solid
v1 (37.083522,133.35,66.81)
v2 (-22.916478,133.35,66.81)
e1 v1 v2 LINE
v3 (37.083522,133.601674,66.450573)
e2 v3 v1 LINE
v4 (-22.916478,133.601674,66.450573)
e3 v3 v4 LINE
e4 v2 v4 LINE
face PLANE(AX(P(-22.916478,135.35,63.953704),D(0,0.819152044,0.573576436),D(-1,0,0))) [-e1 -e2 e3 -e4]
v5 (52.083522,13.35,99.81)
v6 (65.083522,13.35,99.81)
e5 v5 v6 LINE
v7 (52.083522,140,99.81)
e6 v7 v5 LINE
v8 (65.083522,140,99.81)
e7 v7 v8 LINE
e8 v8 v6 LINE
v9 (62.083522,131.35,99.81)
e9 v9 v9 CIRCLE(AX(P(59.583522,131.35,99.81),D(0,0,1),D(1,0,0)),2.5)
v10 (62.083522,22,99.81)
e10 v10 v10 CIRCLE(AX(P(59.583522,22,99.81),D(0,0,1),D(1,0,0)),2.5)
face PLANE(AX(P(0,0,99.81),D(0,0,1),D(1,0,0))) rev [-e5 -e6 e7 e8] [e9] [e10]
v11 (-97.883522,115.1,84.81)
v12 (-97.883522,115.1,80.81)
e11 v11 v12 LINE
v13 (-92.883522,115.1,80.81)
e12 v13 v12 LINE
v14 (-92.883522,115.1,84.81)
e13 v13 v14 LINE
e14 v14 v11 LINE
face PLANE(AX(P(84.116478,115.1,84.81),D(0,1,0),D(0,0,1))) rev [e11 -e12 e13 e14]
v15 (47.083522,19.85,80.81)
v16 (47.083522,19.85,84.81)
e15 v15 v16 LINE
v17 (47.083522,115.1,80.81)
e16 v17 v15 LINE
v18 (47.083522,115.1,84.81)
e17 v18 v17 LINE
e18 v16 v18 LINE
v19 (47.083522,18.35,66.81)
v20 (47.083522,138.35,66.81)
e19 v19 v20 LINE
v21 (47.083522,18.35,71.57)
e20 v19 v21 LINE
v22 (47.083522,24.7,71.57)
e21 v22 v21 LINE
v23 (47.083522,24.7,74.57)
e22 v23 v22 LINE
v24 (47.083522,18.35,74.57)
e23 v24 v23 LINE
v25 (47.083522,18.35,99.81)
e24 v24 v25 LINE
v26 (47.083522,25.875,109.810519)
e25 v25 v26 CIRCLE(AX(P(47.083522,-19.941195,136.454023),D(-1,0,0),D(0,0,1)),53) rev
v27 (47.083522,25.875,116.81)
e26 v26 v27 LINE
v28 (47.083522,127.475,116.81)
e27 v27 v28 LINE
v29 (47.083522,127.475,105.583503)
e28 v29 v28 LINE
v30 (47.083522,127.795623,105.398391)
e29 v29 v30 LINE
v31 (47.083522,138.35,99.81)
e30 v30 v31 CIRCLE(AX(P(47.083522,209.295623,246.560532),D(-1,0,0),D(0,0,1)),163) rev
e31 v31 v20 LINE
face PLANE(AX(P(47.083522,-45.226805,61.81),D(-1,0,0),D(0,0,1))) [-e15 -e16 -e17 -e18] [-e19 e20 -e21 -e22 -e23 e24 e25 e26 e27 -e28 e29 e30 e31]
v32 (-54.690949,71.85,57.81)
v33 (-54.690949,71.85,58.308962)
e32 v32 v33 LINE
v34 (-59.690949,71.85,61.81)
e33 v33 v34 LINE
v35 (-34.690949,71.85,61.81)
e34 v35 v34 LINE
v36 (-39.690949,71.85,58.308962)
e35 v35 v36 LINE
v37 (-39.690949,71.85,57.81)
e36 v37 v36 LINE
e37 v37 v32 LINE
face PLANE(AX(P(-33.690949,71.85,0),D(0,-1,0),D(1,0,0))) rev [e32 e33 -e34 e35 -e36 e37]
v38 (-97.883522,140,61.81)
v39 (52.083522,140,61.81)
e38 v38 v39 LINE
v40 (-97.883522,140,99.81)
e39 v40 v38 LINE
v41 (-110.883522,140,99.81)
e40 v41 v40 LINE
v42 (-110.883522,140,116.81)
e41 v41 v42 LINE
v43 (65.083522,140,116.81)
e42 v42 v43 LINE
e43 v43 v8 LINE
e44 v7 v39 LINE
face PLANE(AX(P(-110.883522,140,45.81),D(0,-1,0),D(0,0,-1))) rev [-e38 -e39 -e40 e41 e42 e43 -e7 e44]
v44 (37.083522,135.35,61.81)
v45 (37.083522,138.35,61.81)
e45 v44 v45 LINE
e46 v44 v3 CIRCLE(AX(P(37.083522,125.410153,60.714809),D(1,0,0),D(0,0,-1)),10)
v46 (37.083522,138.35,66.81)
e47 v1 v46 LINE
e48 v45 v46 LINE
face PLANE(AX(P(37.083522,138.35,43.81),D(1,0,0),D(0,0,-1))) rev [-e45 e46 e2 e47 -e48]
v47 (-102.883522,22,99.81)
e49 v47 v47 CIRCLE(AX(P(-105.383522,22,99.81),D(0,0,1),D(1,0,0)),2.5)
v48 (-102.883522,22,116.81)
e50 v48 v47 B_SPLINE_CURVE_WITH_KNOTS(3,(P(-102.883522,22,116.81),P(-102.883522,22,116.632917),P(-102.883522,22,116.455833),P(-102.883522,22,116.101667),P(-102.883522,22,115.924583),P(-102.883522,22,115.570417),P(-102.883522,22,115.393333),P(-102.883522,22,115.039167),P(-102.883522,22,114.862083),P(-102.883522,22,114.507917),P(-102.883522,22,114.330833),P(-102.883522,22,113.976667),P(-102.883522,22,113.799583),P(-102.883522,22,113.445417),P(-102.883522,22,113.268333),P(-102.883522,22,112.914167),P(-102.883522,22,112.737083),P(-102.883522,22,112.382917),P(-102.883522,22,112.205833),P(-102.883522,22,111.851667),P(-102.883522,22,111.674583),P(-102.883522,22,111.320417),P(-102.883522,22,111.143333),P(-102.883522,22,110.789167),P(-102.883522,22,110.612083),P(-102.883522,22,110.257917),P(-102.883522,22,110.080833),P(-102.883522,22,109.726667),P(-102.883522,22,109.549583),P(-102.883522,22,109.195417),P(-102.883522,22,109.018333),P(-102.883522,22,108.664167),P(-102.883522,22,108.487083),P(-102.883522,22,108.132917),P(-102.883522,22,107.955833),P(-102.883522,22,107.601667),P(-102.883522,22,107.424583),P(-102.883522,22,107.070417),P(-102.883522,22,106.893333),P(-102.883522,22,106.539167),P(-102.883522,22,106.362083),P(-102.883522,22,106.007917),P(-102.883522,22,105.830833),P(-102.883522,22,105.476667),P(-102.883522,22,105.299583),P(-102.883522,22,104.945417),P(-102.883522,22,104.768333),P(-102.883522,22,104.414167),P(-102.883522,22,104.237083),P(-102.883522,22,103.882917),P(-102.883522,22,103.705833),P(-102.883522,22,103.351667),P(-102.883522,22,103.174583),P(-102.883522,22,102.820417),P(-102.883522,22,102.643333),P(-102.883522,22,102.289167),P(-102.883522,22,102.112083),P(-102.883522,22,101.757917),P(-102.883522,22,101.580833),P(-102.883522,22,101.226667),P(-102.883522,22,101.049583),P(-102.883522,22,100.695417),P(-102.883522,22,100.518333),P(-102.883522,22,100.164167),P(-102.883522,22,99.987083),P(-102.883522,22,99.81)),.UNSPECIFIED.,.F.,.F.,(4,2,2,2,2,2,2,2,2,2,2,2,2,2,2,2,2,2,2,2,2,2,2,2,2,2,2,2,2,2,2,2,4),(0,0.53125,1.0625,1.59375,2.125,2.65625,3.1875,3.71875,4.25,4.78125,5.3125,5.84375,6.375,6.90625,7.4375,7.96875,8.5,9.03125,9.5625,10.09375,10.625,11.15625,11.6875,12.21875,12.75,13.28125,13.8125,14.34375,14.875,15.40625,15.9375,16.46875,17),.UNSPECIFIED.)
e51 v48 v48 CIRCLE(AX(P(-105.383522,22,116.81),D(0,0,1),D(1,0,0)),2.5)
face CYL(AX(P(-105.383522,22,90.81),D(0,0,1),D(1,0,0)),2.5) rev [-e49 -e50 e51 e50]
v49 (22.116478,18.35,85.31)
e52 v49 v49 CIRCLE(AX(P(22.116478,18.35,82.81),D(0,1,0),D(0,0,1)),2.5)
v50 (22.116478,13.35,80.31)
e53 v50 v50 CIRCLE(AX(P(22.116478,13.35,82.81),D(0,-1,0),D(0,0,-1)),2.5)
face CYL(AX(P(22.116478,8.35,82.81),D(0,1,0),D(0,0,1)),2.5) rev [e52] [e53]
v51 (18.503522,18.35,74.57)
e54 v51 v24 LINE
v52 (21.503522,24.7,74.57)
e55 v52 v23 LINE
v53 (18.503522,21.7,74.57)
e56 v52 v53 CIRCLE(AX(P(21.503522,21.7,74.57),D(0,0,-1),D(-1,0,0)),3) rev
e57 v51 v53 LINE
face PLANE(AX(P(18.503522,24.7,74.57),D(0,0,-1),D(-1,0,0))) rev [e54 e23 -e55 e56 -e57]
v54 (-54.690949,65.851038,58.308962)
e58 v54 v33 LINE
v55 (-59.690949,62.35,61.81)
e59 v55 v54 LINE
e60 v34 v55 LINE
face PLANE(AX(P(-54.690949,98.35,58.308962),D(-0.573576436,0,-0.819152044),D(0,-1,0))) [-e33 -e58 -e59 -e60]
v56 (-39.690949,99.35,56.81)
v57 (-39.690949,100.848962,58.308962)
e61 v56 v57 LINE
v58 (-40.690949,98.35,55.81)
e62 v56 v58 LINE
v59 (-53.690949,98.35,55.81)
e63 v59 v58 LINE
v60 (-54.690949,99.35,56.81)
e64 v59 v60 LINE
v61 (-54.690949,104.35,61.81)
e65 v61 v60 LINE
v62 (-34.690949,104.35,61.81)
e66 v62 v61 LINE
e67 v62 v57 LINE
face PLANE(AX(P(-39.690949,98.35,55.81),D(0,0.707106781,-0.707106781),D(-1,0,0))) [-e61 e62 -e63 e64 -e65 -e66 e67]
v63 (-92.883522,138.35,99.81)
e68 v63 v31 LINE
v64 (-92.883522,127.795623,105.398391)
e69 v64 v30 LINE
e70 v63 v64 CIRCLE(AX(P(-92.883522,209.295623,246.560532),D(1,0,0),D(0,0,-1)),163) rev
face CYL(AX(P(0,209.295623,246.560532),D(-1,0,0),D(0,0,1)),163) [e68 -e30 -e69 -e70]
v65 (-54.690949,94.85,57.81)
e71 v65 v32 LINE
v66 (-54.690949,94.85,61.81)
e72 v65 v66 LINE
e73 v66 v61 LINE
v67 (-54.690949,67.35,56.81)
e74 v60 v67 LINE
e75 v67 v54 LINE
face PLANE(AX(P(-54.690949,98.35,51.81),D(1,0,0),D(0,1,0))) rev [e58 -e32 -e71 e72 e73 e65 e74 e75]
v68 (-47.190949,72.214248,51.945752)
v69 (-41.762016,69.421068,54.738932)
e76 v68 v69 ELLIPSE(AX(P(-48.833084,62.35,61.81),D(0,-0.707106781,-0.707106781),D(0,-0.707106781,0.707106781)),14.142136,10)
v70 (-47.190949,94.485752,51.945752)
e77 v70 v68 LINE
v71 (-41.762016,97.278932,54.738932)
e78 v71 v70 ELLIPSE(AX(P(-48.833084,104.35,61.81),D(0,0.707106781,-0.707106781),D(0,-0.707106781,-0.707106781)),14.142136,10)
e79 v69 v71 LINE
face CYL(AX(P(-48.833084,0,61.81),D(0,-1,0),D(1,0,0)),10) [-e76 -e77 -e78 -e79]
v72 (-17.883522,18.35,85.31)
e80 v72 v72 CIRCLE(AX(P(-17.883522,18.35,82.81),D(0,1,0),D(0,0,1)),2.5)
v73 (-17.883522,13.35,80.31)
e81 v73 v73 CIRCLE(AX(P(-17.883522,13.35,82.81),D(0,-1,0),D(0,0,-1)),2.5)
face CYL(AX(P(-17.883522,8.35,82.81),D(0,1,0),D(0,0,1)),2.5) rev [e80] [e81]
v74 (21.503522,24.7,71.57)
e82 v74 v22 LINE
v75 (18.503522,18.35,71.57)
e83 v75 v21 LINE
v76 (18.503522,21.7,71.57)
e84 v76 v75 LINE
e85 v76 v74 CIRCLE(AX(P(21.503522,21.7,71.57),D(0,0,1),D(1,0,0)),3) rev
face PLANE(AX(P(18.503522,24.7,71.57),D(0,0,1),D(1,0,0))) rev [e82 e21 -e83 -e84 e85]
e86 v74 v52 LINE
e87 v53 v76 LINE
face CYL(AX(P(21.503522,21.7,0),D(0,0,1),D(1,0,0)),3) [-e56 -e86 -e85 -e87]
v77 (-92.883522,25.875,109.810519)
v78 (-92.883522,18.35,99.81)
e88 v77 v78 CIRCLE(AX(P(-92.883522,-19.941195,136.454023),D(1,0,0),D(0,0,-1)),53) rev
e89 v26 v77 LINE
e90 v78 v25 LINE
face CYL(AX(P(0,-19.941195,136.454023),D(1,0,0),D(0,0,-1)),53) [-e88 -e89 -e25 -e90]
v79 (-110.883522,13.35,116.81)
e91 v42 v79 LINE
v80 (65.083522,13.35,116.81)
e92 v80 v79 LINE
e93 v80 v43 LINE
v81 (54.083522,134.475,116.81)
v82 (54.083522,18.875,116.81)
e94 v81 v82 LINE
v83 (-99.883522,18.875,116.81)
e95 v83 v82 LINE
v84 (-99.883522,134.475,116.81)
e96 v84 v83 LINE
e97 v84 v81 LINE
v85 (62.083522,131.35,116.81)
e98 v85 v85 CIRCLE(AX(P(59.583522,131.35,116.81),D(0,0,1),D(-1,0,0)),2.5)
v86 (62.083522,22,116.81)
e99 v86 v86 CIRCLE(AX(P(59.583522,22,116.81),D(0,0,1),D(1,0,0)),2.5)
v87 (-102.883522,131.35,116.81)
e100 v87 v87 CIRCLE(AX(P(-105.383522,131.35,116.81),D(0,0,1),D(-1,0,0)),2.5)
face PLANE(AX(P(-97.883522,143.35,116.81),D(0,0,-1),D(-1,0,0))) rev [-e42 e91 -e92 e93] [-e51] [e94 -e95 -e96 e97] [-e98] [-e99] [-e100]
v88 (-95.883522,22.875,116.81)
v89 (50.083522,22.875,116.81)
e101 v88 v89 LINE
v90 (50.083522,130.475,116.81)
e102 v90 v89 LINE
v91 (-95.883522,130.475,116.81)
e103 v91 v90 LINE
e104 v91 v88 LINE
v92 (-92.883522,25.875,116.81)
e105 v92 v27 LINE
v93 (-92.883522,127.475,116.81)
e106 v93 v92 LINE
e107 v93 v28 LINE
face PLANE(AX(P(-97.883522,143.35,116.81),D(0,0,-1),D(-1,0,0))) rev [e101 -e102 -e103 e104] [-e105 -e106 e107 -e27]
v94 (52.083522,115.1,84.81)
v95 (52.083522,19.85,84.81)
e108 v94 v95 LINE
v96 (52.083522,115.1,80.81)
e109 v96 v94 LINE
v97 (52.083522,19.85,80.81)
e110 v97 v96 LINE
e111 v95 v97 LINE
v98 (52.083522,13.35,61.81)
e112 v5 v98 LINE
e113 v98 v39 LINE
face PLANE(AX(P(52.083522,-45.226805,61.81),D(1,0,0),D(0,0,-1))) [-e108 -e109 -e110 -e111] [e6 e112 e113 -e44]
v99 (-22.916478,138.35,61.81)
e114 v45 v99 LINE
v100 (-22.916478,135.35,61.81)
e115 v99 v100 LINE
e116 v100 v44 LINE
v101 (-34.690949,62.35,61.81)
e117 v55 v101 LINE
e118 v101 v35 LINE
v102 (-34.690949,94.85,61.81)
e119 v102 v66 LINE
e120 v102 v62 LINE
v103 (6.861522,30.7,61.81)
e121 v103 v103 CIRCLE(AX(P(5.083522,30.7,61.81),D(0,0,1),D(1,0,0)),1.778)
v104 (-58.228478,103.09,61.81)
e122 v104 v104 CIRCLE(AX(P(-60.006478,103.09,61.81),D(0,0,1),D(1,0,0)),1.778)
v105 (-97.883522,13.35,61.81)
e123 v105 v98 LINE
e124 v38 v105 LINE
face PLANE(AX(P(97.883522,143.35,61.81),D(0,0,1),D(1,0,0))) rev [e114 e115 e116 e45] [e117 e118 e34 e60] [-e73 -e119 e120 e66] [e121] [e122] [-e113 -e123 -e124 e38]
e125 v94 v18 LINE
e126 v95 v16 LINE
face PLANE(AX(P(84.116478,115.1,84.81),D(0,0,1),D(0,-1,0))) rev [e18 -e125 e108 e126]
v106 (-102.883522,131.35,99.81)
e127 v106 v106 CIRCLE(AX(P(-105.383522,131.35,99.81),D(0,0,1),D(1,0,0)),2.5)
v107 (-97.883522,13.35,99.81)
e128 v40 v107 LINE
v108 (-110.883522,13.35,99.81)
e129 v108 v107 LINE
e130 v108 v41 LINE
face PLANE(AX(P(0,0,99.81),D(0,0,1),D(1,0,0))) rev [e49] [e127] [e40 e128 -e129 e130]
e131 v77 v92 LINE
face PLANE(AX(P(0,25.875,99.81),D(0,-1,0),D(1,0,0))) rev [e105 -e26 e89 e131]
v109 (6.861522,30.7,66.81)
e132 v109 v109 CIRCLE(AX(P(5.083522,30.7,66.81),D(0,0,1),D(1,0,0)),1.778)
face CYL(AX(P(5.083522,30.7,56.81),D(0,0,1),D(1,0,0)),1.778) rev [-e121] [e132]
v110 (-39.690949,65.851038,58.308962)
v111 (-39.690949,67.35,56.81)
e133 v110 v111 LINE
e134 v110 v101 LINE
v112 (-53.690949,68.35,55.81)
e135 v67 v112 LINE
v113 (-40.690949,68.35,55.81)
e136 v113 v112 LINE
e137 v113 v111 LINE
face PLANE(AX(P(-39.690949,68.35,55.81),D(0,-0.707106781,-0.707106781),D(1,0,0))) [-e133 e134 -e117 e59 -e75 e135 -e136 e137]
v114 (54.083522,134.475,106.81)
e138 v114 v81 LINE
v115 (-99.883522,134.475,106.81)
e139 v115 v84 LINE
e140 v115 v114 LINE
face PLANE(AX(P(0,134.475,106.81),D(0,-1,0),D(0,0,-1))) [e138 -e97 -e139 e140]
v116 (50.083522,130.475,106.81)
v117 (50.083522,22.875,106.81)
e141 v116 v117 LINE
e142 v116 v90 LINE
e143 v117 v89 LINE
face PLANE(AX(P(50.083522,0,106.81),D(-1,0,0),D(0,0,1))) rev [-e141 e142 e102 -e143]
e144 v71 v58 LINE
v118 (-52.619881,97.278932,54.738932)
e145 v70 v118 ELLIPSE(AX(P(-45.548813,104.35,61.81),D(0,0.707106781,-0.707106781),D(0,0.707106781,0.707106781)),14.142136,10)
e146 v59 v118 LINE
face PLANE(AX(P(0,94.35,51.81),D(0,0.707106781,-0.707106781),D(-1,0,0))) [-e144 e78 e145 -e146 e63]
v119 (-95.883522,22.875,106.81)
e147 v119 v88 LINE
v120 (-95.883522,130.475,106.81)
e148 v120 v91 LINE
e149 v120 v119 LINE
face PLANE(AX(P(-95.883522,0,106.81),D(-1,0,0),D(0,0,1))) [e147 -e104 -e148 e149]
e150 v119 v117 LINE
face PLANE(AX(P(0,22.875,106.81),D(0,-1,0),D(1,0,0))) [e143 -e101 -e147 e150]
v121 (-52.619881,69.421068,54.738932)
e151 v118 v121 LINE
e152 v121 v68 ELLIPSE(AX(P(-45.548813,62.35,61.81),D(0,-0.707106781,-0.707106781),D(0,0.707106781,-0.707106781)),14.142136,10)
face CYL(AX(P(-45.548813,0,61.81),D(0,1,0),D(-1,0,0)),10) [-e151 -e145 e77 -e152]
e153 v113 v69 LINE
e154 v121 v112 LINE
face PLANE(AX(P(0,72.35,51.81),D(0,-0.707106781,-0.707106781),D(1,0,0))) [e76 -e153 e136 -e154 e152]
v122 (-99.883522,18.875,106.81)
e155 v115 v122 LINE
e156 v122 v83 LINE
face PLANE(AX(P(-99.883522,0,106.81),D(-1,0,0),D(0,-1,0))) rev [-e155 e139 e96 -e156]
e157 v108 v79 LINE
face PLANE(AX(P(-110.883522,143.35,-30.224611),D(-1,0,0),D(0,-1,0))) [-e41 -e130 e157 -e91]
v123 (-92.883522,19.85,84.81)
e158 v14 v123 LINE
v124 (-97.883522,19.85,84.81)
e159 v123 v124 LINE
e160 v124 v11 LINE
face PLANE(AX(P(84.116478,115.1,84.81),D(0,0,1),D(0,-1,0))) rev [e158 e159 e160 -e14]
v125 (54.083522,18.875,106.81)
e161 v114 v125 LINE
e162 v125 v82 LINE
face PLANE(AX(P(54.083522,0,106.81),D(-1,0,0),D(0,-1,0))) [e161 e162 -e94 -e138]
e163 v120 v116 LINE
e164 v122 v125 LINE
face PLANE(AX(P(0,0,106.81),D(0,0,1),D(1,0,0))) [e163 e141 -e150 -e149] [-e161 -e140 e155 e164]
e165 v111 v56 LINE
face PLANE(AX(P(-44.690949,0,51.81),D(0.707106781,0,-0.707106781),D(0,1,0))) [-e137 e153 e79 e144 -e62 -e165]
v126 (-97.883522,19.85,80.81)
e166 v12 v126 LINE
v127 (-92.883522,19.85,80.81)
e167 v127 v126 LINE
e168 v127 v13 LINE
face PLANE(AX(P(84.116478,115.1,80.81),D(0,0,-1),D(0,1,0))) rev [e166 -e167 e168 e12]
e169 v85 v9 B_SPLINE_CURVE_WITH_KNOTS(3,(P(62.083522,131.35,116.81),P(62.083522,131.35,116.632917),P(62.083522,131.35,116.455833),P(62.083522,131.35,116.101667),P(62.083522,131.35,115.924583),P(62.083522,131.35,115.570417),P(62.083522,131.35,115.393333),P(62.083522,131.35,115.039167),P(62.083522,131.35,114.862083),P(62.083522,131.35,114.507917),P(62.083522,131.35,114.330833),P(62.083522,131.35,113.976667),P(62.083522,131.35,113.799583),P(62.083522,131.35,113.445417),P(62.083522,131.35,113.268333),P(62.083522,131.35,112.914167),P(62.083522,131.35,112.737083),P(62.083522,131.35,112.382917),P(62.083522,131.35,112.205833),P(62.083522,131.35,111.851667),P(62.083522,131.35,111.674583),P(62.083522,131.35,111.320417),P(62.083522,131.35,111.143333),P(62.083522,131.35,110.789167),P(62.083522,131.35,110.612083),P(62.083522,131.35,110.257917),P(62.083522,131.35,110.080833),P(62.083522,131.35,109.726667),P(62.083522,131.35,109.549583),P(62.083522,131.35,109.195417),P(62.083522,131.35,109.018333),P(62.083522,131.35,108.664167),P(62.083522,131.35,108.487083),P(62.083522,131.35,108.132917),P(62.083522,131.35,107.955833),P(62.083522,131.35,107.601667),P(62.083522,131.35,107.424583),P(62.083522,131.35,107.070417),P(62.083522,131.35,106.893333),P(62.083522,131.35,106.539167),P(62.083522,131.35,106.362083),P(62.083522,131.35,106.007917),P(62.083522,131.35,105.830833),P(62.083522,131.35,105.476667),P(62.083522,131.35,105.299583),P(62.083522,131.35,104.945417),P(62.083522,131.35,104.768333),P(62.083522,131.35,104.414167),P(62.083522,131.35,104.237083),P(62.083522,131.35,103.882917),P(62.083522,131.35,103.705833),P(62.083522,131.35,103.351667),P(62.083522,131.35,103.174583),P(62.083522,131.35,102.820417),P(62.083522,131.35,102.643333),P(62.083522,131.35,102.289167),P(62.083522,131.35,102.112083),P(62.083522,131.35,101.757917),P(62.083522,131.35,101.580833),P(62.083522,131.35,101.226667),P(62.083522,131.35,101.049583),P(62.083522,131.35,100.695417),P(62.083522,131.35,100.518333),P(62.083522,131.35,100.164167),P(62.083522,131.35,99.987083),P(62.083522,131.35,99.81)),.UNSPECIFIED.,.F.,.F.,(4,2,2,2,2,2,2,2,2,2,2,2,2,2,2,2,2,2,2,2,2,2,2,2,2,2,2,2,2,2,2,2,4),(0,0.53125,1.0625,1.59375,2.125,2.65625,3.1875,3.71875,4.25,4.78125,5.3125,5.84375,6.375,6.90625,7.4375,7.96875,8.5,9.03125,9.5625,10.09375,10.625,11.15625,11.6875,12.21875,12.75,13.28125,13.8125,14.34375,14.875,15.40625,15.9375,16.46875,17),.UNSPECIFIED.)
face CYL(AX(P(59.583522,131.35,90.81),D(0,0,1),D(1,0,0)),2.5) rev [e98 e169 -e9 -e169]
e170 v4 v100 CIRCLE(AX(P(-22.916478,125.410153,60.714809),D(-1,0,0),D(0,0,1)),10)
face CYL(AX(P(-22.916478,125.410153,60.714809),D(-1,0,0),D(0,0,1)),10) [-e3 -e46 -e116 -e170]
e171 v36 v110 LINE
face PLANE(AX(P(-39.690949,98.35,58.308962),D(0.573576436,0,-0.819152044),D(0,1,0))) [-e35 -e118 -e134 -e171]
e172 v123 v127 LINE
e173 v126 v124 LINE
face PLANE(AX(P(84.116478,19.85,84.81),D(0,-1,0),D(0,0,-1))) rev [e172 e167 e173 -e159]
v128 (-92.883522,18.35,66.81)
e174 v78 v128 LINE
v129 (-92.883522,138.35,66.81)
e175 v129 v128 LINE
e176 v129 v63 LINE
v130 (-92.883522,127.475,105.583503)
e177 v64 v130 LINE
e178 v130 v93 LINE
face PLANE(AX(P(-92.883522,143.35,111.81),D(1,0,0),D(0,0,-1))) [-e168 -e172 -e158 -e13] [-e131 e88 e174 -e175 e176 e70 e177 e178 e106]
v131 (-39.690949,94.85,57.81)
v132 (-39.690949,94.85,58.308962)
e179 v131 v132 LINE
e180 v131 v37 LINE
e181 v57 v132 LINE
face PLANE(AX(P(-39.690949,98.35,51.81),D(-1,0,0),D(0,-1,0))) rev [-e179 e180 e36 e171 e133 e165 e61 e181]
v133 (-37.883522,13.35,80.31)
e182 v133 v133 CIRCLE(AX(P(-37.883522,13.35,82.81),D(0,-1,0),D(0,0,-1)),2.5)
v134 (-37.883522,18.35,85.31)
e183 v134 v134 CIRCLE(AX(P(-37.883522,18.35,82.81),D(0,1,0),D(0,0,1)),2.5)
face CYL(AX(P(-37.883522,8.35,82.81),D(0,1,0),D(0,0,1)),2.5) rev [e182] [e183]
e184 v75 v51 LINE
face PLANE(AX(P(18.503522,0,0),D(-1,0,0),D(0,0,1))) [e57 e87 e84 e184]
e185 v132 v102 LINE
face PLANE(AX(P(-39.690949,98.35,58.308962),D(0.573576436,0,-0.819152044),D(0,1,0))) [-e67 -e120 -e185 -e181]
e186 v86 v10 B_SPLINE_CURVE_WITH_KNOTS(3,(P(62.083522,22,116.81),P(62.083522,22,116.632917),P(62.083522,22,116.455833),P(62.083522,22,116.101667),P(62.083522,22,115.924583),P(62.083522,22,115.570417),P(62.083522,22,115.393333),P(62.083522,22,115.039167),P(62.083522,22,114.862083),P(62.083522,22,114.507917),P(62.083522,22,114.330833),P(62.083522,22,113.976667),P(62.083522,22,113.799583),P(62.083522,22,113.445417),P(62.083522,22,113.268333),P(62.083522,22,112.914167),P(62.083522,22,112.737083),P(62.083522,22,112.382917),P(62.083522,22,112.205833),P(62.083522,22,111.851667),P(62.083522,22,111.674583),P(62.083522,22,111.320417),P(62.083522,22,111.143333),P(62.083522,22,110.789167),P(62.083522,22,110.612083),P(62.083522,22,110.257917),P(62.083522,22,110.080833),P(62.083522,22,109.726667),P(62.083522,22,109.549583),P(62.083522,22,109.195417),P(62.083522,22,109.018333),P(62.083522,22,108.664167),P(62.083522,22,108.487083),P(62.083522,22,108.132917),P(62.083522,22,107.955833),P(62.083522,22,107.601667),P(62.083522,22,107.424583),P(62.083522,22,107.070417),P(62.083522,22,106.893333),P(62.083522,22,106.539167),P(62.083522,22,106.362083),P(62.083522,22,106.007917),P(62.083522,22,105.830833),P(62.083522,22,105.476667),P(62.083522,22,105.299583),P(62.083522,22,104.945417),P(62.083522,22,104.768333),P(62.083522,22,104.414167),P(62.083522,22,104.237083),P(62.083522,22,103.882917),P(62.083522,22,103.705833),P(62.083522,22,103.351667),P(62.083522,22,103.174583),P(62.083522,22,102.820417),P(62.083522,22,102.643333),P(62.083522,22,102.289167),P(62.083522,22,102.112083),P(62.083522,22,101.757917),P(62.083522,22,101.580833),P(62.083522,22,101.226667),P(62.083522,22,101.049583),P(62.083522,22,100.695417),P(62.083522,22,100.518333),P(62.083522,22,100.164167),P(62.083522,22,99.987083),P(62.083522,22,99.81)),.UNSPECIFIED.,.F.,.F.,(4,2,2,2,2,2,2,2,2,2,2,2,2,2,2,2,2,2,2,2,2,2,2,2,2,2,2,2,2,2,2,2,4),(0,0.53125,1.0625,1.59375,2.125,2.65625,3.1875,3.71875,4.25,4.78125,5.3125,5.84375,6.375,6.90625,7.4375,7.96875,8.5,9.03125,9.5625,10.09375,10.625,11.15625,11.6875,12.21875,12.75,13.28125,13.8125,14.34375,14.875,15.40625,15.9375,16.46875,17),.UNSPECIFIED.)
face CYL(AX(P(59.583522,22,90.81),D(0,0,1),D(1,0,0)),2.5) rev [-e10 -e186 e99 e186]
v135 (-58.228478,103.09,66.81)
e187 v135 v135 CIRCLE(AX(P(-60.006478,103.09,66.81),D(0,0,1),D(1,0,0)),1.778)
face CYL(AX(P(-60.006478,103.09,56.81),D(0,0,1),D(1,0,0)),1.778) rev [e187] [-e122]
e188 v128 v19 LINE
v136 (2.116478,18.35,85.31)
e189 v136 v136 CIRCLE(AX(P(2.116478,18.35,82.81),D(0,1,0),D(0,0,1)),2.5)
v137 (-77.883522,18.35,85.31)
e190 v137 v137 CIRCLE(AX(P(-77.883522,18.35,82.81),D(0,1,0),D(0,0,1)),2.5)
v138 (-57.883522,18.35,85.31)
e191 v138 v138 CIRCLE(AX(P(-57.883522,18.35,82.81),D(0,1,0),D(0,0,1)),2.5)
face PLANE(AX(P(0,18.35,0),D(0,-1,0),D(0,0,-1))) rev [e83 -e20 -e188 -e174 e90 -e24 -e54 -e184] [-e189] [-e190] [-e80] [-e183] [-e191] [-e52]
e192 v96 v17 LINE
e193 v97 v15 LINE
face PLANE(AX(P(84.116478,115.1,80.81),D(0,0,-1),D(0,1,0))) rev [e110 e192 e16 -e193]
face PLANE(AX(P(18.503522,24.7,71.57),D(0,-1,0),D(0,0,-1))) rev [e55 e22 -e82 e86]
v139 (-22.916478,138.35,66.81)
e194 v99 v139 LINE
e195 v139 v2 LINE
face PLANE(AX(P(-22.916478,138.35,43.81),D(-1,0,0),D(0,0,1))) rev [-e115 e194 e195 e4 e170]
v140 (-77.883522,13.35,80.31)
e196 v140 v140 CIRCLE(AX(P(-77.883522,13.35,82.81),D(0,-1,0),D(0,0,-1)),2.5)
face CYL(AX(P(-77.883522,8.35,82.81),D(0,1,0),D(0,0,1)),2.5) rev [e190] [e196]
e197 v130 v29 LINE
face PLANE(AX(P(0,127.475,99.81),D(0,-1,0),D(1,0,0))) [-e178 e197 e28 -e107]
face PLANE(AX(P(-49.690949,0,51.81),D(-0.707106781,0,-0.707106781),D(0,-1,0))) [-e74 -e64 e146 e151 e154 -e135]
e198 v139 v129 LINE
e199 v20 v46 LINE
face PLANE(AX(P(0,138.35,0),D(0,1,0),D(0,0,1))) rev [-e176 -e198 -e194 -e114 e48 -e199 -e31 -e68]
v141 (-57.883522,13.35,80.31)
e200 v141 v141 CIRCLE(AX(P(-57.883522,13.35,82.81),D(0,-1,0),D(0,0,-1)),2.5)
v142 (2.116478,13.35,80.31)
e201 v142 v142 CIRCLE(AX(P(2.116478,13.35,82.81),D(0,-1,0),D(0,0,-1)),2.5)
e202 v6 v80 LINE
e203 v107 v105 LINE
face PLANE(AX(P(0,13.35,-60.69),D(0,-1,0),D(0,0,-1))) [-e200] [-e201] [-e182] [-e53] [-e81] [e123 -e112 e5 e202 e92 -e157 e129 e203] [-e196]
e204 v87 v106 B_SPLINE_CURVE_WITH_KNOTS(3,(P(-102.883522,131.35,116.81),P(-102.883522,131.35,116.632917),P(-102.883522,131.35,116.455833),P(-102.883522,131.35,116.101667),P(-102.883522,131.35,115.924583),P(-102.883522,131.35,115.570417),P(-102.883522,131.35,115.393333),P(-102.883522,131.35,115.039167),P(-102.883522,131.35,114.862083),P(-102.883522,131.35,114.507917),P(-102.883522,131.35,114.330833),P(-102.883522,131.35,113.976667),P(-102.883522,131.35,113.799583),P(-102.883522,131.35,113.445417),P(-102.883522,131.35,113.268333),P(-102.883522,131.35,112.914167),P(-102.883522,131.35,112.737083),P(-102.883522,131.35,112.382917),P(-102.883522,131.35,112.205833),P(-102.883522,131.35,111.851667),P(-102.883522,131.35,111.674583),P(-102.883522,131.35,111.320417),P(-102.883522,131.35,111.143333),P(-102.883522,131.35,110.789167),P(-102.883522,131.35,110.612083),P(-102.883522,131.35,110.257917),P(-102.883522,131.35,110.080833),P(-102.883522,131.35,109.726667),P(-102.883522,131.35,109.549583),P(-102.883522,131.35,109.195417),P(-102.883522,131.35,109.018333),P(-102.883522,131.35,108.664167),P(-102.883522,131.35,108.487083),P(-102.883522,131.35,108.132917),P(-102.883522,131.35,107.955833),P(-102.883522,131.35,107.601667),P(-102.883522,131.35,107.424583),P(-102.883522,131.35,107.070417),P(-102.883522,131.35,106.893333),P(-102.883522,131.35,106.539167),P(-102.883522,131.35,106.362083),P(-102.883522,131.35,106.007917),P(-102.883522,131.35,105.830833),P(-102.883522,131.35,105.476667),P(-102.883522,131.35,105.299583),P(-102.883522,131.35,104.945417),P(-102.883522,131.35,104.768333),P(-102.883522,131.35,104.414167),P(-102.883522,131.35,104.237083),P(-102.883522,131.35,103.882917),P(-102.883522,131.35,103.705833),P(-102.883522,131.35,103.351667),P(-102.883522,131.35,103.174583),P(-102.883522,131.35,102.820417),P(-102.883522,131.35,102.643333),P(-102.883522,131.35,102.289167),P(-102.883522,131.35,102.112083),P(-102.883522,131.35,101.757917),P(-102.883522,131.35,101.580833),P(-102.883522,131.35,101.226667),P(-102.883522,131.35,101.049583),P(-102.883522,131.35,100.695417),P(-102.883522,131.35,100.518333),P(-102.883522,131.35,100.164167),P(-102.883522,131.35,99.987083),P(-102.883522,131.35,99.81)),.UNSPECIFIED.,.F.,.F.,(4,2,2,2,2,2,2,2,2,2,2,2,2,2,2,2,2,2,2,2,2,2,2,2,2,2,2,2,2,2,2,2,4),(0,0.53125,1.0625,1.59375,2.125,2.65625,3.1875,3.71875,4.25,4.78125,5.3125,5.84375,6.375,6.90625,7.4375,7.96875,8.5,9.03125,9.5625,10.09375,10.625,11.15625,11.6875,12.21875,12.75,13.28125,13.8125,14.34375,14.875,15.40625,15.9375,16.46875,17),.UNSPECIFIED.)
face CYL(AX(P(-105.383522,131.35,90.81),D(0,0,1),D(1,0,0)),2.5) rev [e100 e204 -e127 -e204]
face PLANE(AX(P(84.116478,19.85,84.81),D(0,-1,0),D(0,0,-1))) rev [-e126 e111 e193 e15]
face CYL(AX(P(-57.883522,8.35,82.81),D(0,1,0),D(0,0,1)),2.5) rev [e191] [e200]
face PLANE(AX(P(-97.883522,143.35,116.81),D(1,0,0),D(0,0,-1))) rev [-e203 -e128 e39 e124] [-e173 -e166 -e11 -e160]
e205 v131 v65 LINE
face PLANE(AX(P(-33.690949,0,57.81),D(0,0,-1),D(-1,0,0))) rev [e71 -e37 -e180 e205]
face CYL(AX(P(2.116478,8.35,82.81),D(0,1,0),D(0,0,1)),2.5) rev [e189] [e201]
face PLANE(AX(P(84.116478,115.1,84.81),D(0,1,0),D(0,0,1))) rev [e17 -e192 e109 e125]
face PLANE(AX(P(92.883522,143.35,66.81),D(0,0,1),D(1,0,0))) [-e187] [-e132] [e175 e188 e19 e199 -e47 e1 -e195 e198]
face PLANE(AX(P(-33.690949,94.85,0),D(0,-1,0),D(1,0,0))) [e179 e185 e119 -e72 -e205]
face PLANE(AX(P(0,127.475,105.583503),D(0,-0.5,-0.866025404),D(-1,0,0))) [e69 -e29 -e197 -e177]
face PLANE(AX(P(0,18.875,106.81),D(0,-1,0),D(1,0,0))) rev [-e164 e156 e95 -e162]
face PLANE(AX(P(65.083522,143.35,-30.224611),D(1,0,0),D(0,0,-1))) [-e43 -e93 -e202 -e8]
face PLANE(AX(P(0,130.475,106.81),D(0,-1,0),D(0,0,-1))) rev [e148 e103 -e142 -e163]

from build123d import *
from OCP.BRepFilletAPI import BRepFilletAPI_MakeChamfer

# Parameters (mm, degrees)
SKETCH1_R               = 172.5
BOSS_EXTRUDE1_DEPTH     = 10
SKETCH2_R               = 48.41
CUT_EXTRUDE1_DEPTH      = 10
BOSS_EXTRUDE2_DEPTH     = 5
CUT_EXTRUDE2_DEPTH      = 497
CUT_EXTRUDE6_START      = -497
CUT_EXTRUDE6_DEPTH      = 497
SKETCH6_W               = 195.767044214
SKETCH6_H               = 55
SKETCH6_W_2             = 185.767044214
SKETCH6_H_2             = 45
BOSS_EXTRUDE3_DEPTH     = 133.35
SKETCH7_W               = 185.767044214
SKETCH7_H               = 45
BOSS_EXTRUDE4_DEPTH     = 5
BOSS_EXTRUDE5_DEPTH     = 8
CHAMFER1_SIZE           = 8
CHAMFER1_SIZE2          = 6.250285012
CHAMFER1_PART_2_SIZE    = 8
CHAMFER1_PART_2_SIZE2   = 6.250285012
CHAMFER1_PART_3_SIZE    = 8
CHAMFER1_PART_3_SIZE2   = 6.250285012
FILLET1_R               = 38
SKETCH9_R               = 374.079334695
CUT_EXTRUDE7_DEPTH      = 93
CUT_EXTRUDE8_DEPTH      = 93
CUT_EXTRUDE8_DEPTH_BACK = 93
SKETCH10_R              = 229.38613092
SKETCH10_R_2            = 152.4
SKETCH11_W              = 291.443368419
SKETCH11_H              = 134.798764099
SKETCH11_W_2            = 144.967044214
SKETCH11_H_2            = 55
CUT_EXTRUDE9_DEPTH      = 143
SKETCH12_W              = 5
SKETCH12_H              = 55
BOSS_EXTRUDE6_DEPTH     = 133.35
SKETCH14_W              = 139.967044214
SKETCH14_H              = 45
BOSS_EXTRUDE7_DEPTH     = 5
SKETCH15_W              = 139.967044214
SKETCH15_H              = 123.35
CUT_EXTRUDE11_DEPTH     = 13
SKETCH16_W              = 10
SKETCH16_H              = 133.35
SKETCH16_W_2            = 149.967044214
BOSS_EXTRUDE9_DEPTH     = 17
SKETCH17_W              = 153.967044214
SKETCH17_H              = 115.6
SKETCH17_W_2            = 145.967044214
SKETCH17_H_2            = 107.6
CUT_EXTRUDE12_DEPTH     = 10
CHAMFER2_SIZE           = 10
CHAMFER2_SIZE2          = 5.773502692
SKETCH20_W              = 169.967044214
SKETCH20_H              = 3.35
CUT_EXTRUDE17_DEPTH     = 177.5
SKETCH25_W              = 139.967044214
SKETCH25_H              = 38.773502692
BOSS_EXTRUDE11_DEPTH    = 5
SKETCH26_W              = 3
SKETCH26_H              = 130
BOSS_EXTRUDE12_DEPTH    = 17
SKETCH18_R              = 2.5
CUT_EXTRUDE19_DEPTH     = 26
SKETCH27_W              = 60
SKETCH27_H              = 3
CUT_EXTRUDE20_DEPTH     = 23
SKETCH28_R              = 2.5
CUT_EXTRUDE21_DEPTH     = 10
SKETCH29_W              = 15
SKETCH29_H              = 30
BOSS_EXTRUDE13_DEPTH    = 10
SKETCH30_W              = 4
SKETCH30_H              = 23
CUT_EXTRUDE22_DEPTH     = 21
CHAMFER3_SIZE           = 6
SKETCH31_W              = 175.967044214
SKETCH31_H              = 24.006818343
CUT_EXTRUDE23_DEPTH     = 71
SKETCH33_W              = 4
SKETCH33_H              = 95.25
CUT_EXTRUDE25_DEPTH     = 182
CHAMFER5_SIZE           = 5
CHAMFER6_SIZE           = 4
FILLET2_R               = 10
SKETCH32_R              = 1.778
CUT_EXTRUDE26_DEPTH     = 10
CHAMFER7_SIZE           = 5
CHAMFER7_SIZE2          = 3.501037691
SKETCH34_W              = 3
SKETCH34_H              = 6.35
BOSS_EXTRUDE14_DEPTH    = 28.58
FILLET3_R               = 3
FILLET4_R               = 53
FILLET5_R               = 163
CHAMFER8_SIZE           = 2
CHAMFER8_SIZE2          = 2.856296013
FILLET7_R               = 10


# Some blends are built 0.0001 mm under size
with BuildPart() as part:
    # Sketch1 → Boss-Extrude1 (new body)
    with BuildSketch(Plane(origin=(0, 0, 0), x_dir=(1, 0, 0), z_dir=(0, 1, 0))):
        with Locations(Location((0, 0, 0), (0, 0, 270))):
            Circle(SKETCH1_R)
    extrude(amount=BOSS_EXTRUDE1_DEPTH)

    # Sketch2 → Cut-Extrude1 (cut)
    with BuildSketch(Plane(origin=(0, 10, 0), x_dir=(1, 0, 0), z_dir=(0, 1, 0))):
        with Locations((-75.91, -178.72)):
            Circle(SKETCH2_R)
        with Locations((75.91, -178.72)):
            Circle(SKETCH2_R)
    extrude(amount=-CUT_EXTRUDE1_DEPTH, mode=Mode.SUBTRACT)

    # Sketch3 → Boss-Extrude2 (add)
    with BuildSketch(Plane(origin=(0, 10, 0), x_dir=(1, 0, 0), z_dir=(0, 1, 0))):
        with BuildLine():
            Line((-98.968297449, -119.81), (98.968297449, -119.81))
            ThreePointArc((98.968297449, -119.81), (0, 155.4), (-98.968297449, -119.81))
        make_face()
        with BuildLine():
            ThreePointArc((97.883522107, -116.81), (0, 152.4), (-97.883522107, -116.81))
            Line((-97.883522107, -116.81), (97.883522107, -116.81))
        make_face(mode=Mode.SUBTRACT)
    extrude(amount=BOSS_EXTRUDE2_DEPTH)

    # Sketch4 → Cut-Extrude2 (cut)
    with BuildSketch(Plane(origin=(0, 10, 0), x_dir=(1, 0, 0), z_dir=(0, 1, 0))):
        Polygon((-28.261160255, -170.169200565), (28.261160255, -170.169200565), (28.261160255, -183.836149753), (-30.300470404, -183.836149753), align=None)
    extrude(amount=-CUT_EXTRUDE2_DEPTH, mode=Mode.SUBTRACT)

    # Sketch5 → Cut-Extrude6 (cut)
    with BuildSketch(Plane(origin=(0, 10, 0), x_dir=(1, 0, 0), z_dir=(0, 1, 0)).offset(CUT_EXTRUDE6_START)):
        with BuildLine():
            ThreePointArc((26.702080818, 170.420799435), (0, 172.5), (-26.702080818, 170.420799435))
            Line((-26.702080818, 170.420799435), (26.702080818, 170.420799435))
        make_face()
        with BuildLine():
            ThreePointArc((166.525, -45.007492432), (172.5, 0), (166.525, 45.007492432))
            Line((166.525, 45.007492432), (166.525, -45.007492432))
        make_face()
        with BuildLine():
            Line((-166.525, -45.007492432), (-166.525, 45.007492432))
            ThreePointArc((-166.525, 45.007492432), (-172.5, 0), (-166.525, -45.007492432))
        make_face()
    extrude(amount=CUT_EXTRUDE6_DEPTH, mode=Mode.SUBTRACT)

    # Sketch6 → Boss-Extrude3 (add)
    with BuildSketch(Plane(origin=(0, 10, 0), x_dir=(1, 0, 0), z_dir=(0, 1, 0))):
        with Locations((0, -89.31)):
            Rectangle(SKETCH6_W, SKETCH6_H)
        with Locations((0, -89.31)):
            Rectangle(SKETCH6_W_2, SKETCH6_H_2, mode=Mode.SUBTRACT)
    extrude(amount=BOSS_EXTRUDE3_DEPTH)

    # Sketch7 → Boss-Extrude4 (add)
    with BuildSketch(Plane(origin=(0, 10, 0), x_dir=(1, 0, 0), z_dir=(0, 1, 0))):
        with Locations((0, -89.31)):
            Rectangle(SKETCH7_W, SKETCH7_H)
    extrude(amount=BOSS_EXTRUDE4_DEPTH)

    # Sketch8 → Boss-Extrude5 (add)
    with BuildSketch(Plane(origin=(0, 10, 0), x_dir=(1, 0, 0), z_dir=(0, 1, 0))):
        with BuildLine():
            Line((-97.883522107, -61.81), (-112.883522107, -61.81))
            Line((-112.883522107, -61.81), (-112.883522107, -101.267136509))
            ThreePointArc((-112.883522107, -101.267136509), (-105.634768892, -108.807252061), (-97.883522107, -115.829782871))
            Line((-97.883522107, -115.829782871), (-97.883522107, -61.81))
        make_face()
        with BuildLine():
            Line((-88.028513968, -46.81), (-88.028513968, -61.81))
            Line((-88.028513968, -61.81), (97.883522107, -61.81))
            Line((97.883522107, -61.81), (97.883522107, -115.829782871))
            ThreePointArc((97.883522107, -115.829782871), (105.634768892, -108.807252061), (112.883522107, -101.267136509))
            Line((112.883522107, -101.267136509), (112.883522107, -46.81))
            Line((112.883522107, -46.81), (-88.028513968, -46.81))
        make_face()
    extrude(amount=BOSS_EXTRUDE5_DEPTH)

    # Chamfer1
    chamfer1_edges = [part.edges().sort_by_distance(p)[0] for p in [
        (-97.883522107, 18, 88.819891436),
    ]]
    chamfer1_side = [part.faces().sort_by_distance(p)[0] for p in [
        (-97.883522107, 80.599247918, 89.340686997),
    ]]
    chamfer(chamfer1_edges, length=CHAMFER1_SIZE, length2=CHAMFER1_SIZE2, reference=chamfer1_side[0])

    # Chamfer1 part 2
    chamfer1_part_2_edges = [part.edges().sort_by_distance(p)[0] for p in [
        (4.927504069, 18, 61.81),
    ]]
    chamfer1_part_2_side = [part.faces().sort_by_distance(p)[0] for p in [
        (-0.807441513, 80.139082253, 61.81),
    ]]
    chamfer(chamfer1_part_2_edges, length=CHAMFER1_PART_2_SIZE, length2=CHAMFER1_PART_2_SIZE2, reference=chamfer1_part_2_side[0])

    # Chamfer1 part 3
    chamfer1_part_3_edges = [part.edges().sort_by_distance(p)[0] for p in [
        (97.883522107, 18, 88.819891436),
    ]]
    chamfer1_part_3_side = [part.faces().sort_by_distance(p)[0] for p in [
        (97.883522107, 80.599247918, 89.340686997),
    ]]
    chamfer(chamfer1_part_3_edges, length=CHAMFER1_PART_3_SIZE, length2=CHAMFER1_PART_3_SIZE2, reference=chamfer1_part_3_side[0])

    # Fillet1
    # the kernel refuses this fillet: 38 mm, written as the material it adds along each edge
    with BuildSketch(Plane(origin=(-97.883522107, 26, 148.028657271), x_dir=(-0.61566147532566, -0.7880107536067207, 0), z_dir=(0, 0, -1))) as fillet1_piece_1_section:
        with BuildLine():
            CenterArc((13.24591235, 37.873851244), FILLET1_R, 232, 33.330100487)
            Line((-10.149223713, 7.929442607), (0, 0))
            Line((0, 0), (10.152145721, 0))
        make_face()
    fillet1_piece_1 = extrude(amount=86.218657271, mode=Mode.PRIVATE)
    fillet1_piece_1 = fillet1_piece_1 & Plane(origin=(0, 26, 0), x_dir=(-0.7443687577094257, 0, 0.6677687867414337), z_dir=(0, -1, 0)) * Cylinder(151.65, 214, mode=Mode.PRIVATE)
    add(fillet1_piece_1)
    with BuildSketch(Plane(origin=(-88.028513968, 26, 61.81), x_dir=(0, 1, 0), z_dir=(1, 0, 0))) as fillet1_piece_2_section:
        with BuildLine():
            CenterArc((12.87954976, -38), FILLET1_R, 90, 33.330100487)
            Line((-8, -6.250285012), (0, 0))
            Line((0, 0), (12.87954976, 0))
        make_face()
    fillet1_piece_2 = extrude(amount=218.110910475, mode=Mode.PRIVATE)
    fillet1_piece_2 = fillet1_piece_2 - Plane(origin=(135.883522107, 38.87954976, 61.81), x_dir=(-0.8355188154722692, -0.5494618357919104, 0), z_dir=(0, 0, -1)) * Cylinder(38, 488, mode=Mode.PRIVATE)
    add(fillet1_piece_2)
    with BuildSketch(Plane(origin=(97.883522107, 26, 29.6111256), x_dir=(0.61566147532566, -0.7880107536067207, 0), z_dir=(0, 0, 1))) as fillet1_piece_3_section:
        with BuildLine():
            CenterArc((13.24591235, 37.873851244), FILLET1_R, 232, 33.330100487)
            Line((-10.149223713, 7.929442607), (0, 0))
            Line((0, 0), (10.152145721, 0))
        make_face()
    fillet1_piece_3 = extrude(amount=118.417531672, mode=Mode.PRIVATE)
    fillet1_piece_3 = fillet1_piece_3 & Plane(origin=(0, 26, 0), x_dir=(0.6454567893612635, 0, 0.7637967878090673), z_dir=(0, -1, 0)) * Cylinder(151.65, 278, mode=Mode.PRIVATE)
    fillet1_piece_3 = fillet1_piece_3 - Plane(origin=(97.883522107, 38.87954976, 23.81), x_dir=(0, 0, 1), z_dir=(-1, 0, 0)) * Cylinder(38, 278, mode=Mode.PRIVATE)
    add(fillet1_piece_3)

    # Sketch9 → Cut-Extrude7 (cut)
    with BuildSketch(Plane(origin=(0, 10, 0), x_dir=(1, 0, 0), z_dir=(0, 1, 0))):
        Circle(SKETCH9_R)
    extrude(amount=-CUT_EXTRUDE7_DEPTH, mode=Mode.SUBTRACT)

    # Sketch10 → Cut-Extrude8 (cut, two sides: drawn at the far end of the back side and taken through both)
    with BuildSketch(Plane.XZ.offset(-10).offset(-CUT_EXTRUDE8_DEPTH_BACK)):
        Circle(SKETCH10_R)
        Circle(SKETCH10_R_2, mode=Mode.SUBTRACT)
    extrude(amount=CUT_EXTRUDE8_DEPTH + CUT_EXTRUDE8_DEPTH_BACK, mode=Mode.SUBTRACT)

    # Sketch11 → Cut-Extrude9 (cut)
    with BuildSketch(Plane(origin=(0, 143.35, 0), x_dir=(1, 0, 0), z_dir=(0, 1, 0))):
        with Locations((4.840839595, -88.771460056)):
            Rectangle(SKETCH11_W, SKETCH11_H)
        with Locations((-25.4, -89.31)):
            Rectangle(SKETCH11_W_2, SKETCH11_H_2, mode=Mode.SUBTRACT)
    extrude(amount=-CUT_EXTRUDE9_DEPTH, mode=Mode.SUBTRACT)

    # Sketch12 → Boss-Extrude6 (add)
    with BuildSketch(Plane(origin=(0, 143.35, 0), x_dir=(1, 0, 0), z_dir=(0, 1, 0))):
        with Locations((49.583522107, -89.31)):
            Rectangle(SKETCH12_W, SKETCH12_H)
    extrude(amount=-BOSS_EXTRUDE6_DEPTH)

    # Sketch14 → Boss-Extrude7 (add)
    with BuildSketch(Plane(origin=(0, 143.35, 0), x_dir=(1, 0, 0), z_dir=(0, 1, 0))):
        with Locations((-22.9, -89.31)):
            Rectangle(SKETCH14_W, SKETCH14_H)
    extrude(amount=-BOSS_EXTRUDE7_DEPTH)

    # Sketch15 → Cut-Extrude11 (cut)
    with BuildSketch(Plane.XY.offset(116.81)):
        with Locations((-22.9, 76.675)):
            Rectangle(SKETCH15_W, SKETCH15_H)
    extrude(amount=-CUT_EXTRUDE11_DEPTH, mode=Mode.SUBTRACT)

    # Sketch16 → Boss-Extrude9 (add)
    # profile 1 of 5: a face of its own
    with BuildSketch(Plane.XY.offset(116.81)):
        with Locations((-102.883522107, 76.675)):
            Rectangle(SKETCH16_W, SKETCH16_H)
    # profile 2 of 5: a face of its own
    with BuildSketch(Plane.XY.offset(116.81)):
        with Locations((-22.9, 76.675)):
            Rectangle(SKETCH16_W_2, SKETCH16_H)
        Polygon((-92.883522107, 127.475), (-92.883522107, 138.35), (47.083522107, 138.35), (47.083522107, 127.475), (47.083522107, 76.675), (47.083522107, 25.875), (47.083522107, 15), (-92.883522107, 15), (-92.883522107, 25.875), (-92.883522107, 76.675), align=None, mode=Mode.SUBTRACT)
    # profile 3 of 5: a face of its own
    with BuildSketch(Plane.XY.offset(116.81)):
        with Locations((57.083522107, 76.675)):
            Rectangle(SKETCH16_W, SKETCH16_H)
    # profile 4 of 5: a face of its own
    with BuildSketch(Plane.XY.offset(116.81)):
        Polygon((47.083522107, 138.35), (-92.883522107, 138.35), (-92.883522107, 127.475), (-22.9, 127.475), (47.083522107, 127.475), align=None)
    # profile 5 of 5: a face of its own
    with BuildSketch(Plane.XY.offset(116.81)):
        Polygon((-22.9, 25.875), (-92.883522107, 25.875), (-92.883522107, 15), (47.083522107, 15), (47.083522107, 25.875), align=None)
    extrude(amount=-BOSS_EXTRUDE9_DEPTH)

    # Sketch17 → Cut-Extrude12 (cut)
    with BuildSketch(Plane.XY.offset(116.81)):
        with Locations((-22.9, 76.675)):
            Rectangle(SKETCH17_W, SKETCH17_H)
        with Locations((-22.9, 76.675)):
            Rectangle(SKETCH17_W_2, SKETCH17_H_2, mode=Mode.SUBTRACT)
    extrude(amount=-CUT_EXTRUDE12_DEPTH, mode=Mode.SUBTRACT)

    # Chamfer2: one chamfer whose edges measure the first distance from different faces: ONE call of the kernel's chamfer builder (chamfer() names one face for all edges)
    chamfer2_edges_1 = [part.edges().sort_by_distance(p)[0] for p in [
        (-22.9, 25.875, 99.81),
    ]]
    chamfer2_side_1 = [part.faces().sort_by_distance(p)[0] for p in [
        (-22.9, 25.875, 108.31),
    ]]
    chamfer2_edges_2 = [part.edges().sort_by_distance(p)[0] for p in [
        (-22.9, 127.475, 99.81),
    ]]
    chamfer2_side_2 = [part.faces().sort_by_distance(p)[0] for p in [
        (-22.9, 132.9125, 99.81),
    ]]
    chamfer2 = BRepFilletAPI_MakeChamfer(part.part.solid().wrapped)
    for e in chamfer2_edges_1:
        chamfer2.Add(CHAMFER2_SIZE, CHAMFER2_SIZE2, e.wrapped, chamfer2_side_1[0].wrapped)  # the first distance lies on this face
    for e in chamfer2_edges_2:
        chamfer2.Add(CHAMFER2_SIZE, CHAMFER2_SIZE2, e.wrapped, chamfer2_side_2[0].wrapped)  # the first distance lies on this face
    add(Compound.cast(chamfer2.Shape()), mode=Mode.REPLACE)

    # Sketch20 → Cut-Extrude17 (cut)
    with BuildSketch(Plane.XY.offset(116.81)):
        with Locations((-22.9, 11.675)):
            Rectangle(SKETCH20_W, SKETCH20_H)
    extrude(amount=-CUT_EXTRUDE17_DEPTH, mode=Mode.SUBTRACT)

    # Sketch25 → Boss-Extrude11 (add)
    with BuildSketch(Plane(origin=(0, 13.35, 0), x_dir=(-1, 0, 0), z_dir=(0, -1, 0))):
        with Locations((22.9, -86.196751346)):
            Rectangle(SKETCH25_W, SKETCH25_H)
    extrude(amount=-BOSS_EXTRUDE11_DEPTH)

    # Sketch26 → Boss-Extrude12 (add)
    with BuildSketch(Plane.XY.offset(116.81)):
        with Locations((-109.383522107, 78.35)):
            Rectangle(SKETCH26_W, SKETCH26_H)
        with Locations((63.583522107, 78.35)):
            Rectangle(SKETCH26_W, SKETCH26_H)
    extrude(amount=-BOSS_EXTRUDE12_DEPTH)

    # Sketch18 → Cut-Extrude19 (cut)
    with BuildSketch(Plane.XY.offset(116.81)):
        with Locations((-105.383522107, 22)):
            Circle(SKETCH18_R)
        with Locations((59.583522107, 22)):
            Circle(SKETCH18_R)
        with Locations((59.583522107, 131.35)):
            Circle(SKETCH18_R)
        with Locations((-105.383522107, 131.35)):
            Circle(SKETCH18_R)
    extrude(amount=-CUT_EXTRUDE19_DEPTH, mode=Mode.SUBTRACT)

    # Sketch27 → Cut-Extrude20 (cut)
    with BuildSketch(Plane.XY.offset(66.81)):
        with Locations((7.083522107, 136.85)):
            Rectangle(SKETCH27_W, SKETCH27_H)
    extrude(amount=-CUT_EXTRUDE20_DEPTH, mode=Mode.SUBTRACT)

    # Sketch28 → Cut-Extrude21 (cut)
    with BuildSketch(Plane(origin=(0, 18.35, 0), x_dir=(1, 0, 0), z_dir=(0, 1, 0))):
        with Locations(Location((-77.883522107, -82.81, 0), (0, 0, 270))):
            Circle(SKETCH28_R)
        with Locations(Location((-57.883522107, -82.81, 0), (0, 0, 270))):
            Circle(SKETCH28_R)
        with Locations(Location((-37.883522107, -82.81, 0), (0, 0, 270))):
            Circle(SKETCH28_R)
        with Locations(Location((-17.883522107, -82.81, 0), (0, 0, 270))):
            Circle(SKETCH28_R)
        with Locations(Location((2.116477893, -82.81, 0), (0, 0, 270))):
            Circle(SKETCH28_R)
        with Locations(Location((22.116477893, -82.81, 0), (0, 0, 270))):
            Circle(SKETCH28_R)
    extrude(amount=-CUT_EXTRUDE21_DEPTH, mode=Mode.SUBTRACT)

    # Sketch29 → Boss-Extrude13 (add)
    with BuildSketch(Plane(origin=(0, 0, 61.81), x_dir=(-1, 0, 0), z_dir=(0, 0, -1))):
        with Locations((47.190948631, 83.35)):
            Rectangle(SKETCH29_W, SKETCH29_H)
    extrude(amount=BOSS_EXTRUDE13_DEPTH)

    # Sketch30 → Cut-Extrude22 (cut)
    with BuildSketch(Plane.ZY.offset(54.690948631)):
        with Locations((59.81, 83.35)):
            Rectangle(SKETCH30_W, SKETCH30_H)
    extrude(amount=-CUT_EXTRUDE22_DEPTH, mode=Mode.SUBTRACT)

    # Chamfer3
    chamfer3_edges = [part.edges().sort_by_distance(p)[0] for p in [
        (-47.190948631, 68.35, 61.81),
        (-47.190948631, 98.35, 61.81),
    ]]
    chamfer(chamfer3_edges, length=CHAMFER3_SIZE)

    # Sketch31 → Cut-Extrude23 (cut)
    with BuildSketch(Plane.XY.offset(116.81)):
        with Locations((-22.9, 1.346590829)):
            Rectangle(SKETCH31_W, SKETCH31_H)
        with Locations((-22.9, 152.003409172)):
            Rectangle(SKETCH31_W, SKETCH31_H)
    extrude(amount=-CUT_EXTRUDE23_DEPTH, mode=Mode.SUBTRACT)

    # Sketch33 → Cut-Extrude25 (cut)
    with BuildSketch(Plane.ZY.offset(97.883522107)):
        with Locations((82.81, 67.475)):
            Rectangle(SKETCH33_W, SKETCH33_H)
    extrude(amount=-CUT_EXTRUDE25_DEPTH, mode=Mode.SUBTRACT)

    # Chamfer5
    chamfer5_edges = [part.edges().sort_by_distance(p)[0] for p in [
        (-39.690948631, 83.35, 51.81),
        (-54.690948631, 83.35, 51.81),
    ]]
    chamfer(chamfer5_edges, length=CHAMFER5_SIZE)

    # Chamfer6
    chamfer6_edges = [part.edges().sort_by_distance(p)[0] for p in [
        (-47.190948631, 98.35, 51.81),
        (-47.190948631, 68.35, 51.81),
    ]]
    chamfer(chamfer6_edges, length=CHAMFER6_SIZE - 0.0001)  # a hair under: the kernel refuses the full size

    # Fillet2
    # the kernel refuses this fillet: 10 mm, written as the material it takes off along each edge
    with BuildSketch(Plane(origin=(-49.690948631, 104.705439059, 51.81), x_dir=(-0.7071067811865475, 0, 0.7071067811865475), z_dir=(0, -1, 0))) as fillet2_piece_1:
        with BuildLine():
            CenterArc((FILLET2_R * 0.414213562373, -FILLET2_R), FILLET2_R, 90, 45)
            Line((-FILLET2_R * 0.292893218813, -FILLET2_R * 0.292893218813), (0, 0))
            Line((0, 0), (FILLET2_R * 0.414213562373, 0))
        make_face()
    extrude(amount=42.710878119, mode=Mode.SUBTRACT)
    with BuildSketch(Plane(origin=(-44.690948631, 61.994560941, 51.81), x_dir=(-1, 0, 0), z_dir=(0, 1, 0))) as fillet2_piece_2:
        with BuildLine():
            CenterArc((FILLET2_R * 0.414213562373, FILLET2_R), FILLET2_R, 225, 45)
            Line((-FILLET2_R * 0.292893218813, FILLET2_R * 0.292893218813), (0, 0))
            Line((0, 0), (FILLET2_R * 0.414213562373, 0))
        make_face()
    extrude(amount=42.710878119, mode=Mode.SUBTRACT)

    # Sketch32 → Cut-Extrude26 (cut)
    with BuildSketch(Plane.XY.offset(66.81)):
        with Locations((-60.006477893, 103.09)):
            Circle(SKETCH32_R)
        with Locations((5.083522107, 30.7)):
            Circle(SKETCH32_R)
    extrude(amount=-CUT_EXTRUDE26_DEPTH, mode=Mode.SUBTRACT)

    # Chamfer7
    chamfer7_edges = [part.edges().sort_by_distance(p)[0] for p in [
        (-39.690948631, 99.6, 61.81),
        (-54.690948631, 67.1, 61.81),
        (-39.690948631, 67.1, 61.81),
    ]]
    chamfer7_side = [part.faces().sort_by_distance(p)[0] for p in [
        (-22.812662078, 75.997492885, 61.81),
    ]]
    chamfer(chamfer7_edges, length=CHAMFER7_SIZE, length2=CHAMFER7_SIZE2, reference=chamfer7_side[0])

    # Sketch34 → Boss-Extrude14 (add)
    with BuildSketch(Plane.ZY.offset(-47.083522107)):
        with Locations((73.07, 21.525)):
            Rectangle(SKETCH34_W, SKETCH34_H)
    extrude(amount=BOSS_EXTRUDE14_DEPTH)

    # Fillet3
    fillet3_edges = [part.edges().sort_by_distance(p)[0] for p in [
        (18.503522107, 24.7, 73.07),
    ]]
    fillet(fillet3_edges, radius=FILLET3_R)

    # Fillet4
    # the kernel refuses this fillet: 53 mm, written as the material it takes off along each edge
    with BuildSketch(Plane(origin=(47.083522107, 20.101497308, 99.81), x_dir=(0, 0.5000000000000011, 0.866025403784438), z_dir=(-1, 0, 0))) as fillet4_piece_1:
        with BuildLine():
            CenterArc((11.713308348, -53), FILLET4_R, 90, 13.740767961)
            Line((-0.875748654, -1.516841163), (0, 0))
            Line((0, 0), (11.713308348, 0))
        make_face()
    extrude(amount=139.967044213, mode=Mode.SUBTRACT)

    # Fillet5
    # the kernel refuses this fillet: 163 mm, written as the material it takes off along each edge
    with BuildSketch(Plane(origin=(-92.883522107, 137.475, 99.81), x_dir=(0, 1, 0), z_dir=(1, 0, 0))) as fillet5_piece_1:
        with BuildLine():
            CenterArc((71.820622524, 146.750532008), FILLET5_R, 240, 4.198846939)
            Line((-9.679377476, 5.588391191), (0, 0))
            Line((0, 0), (0.875, 0))
        make_face()
    extrude(amount=139.967044213, mode=Mode.SUBTRACT)

    # Chamfer8
    chamfer8_edges = [part.edges().sort_by_distance(p)[0] for p in [
        (7.083522107, 135.35, 66.81),
    ]]
    chamfer8_side = [part.faces().sort_by_distance(p)[0] for p in [
        (-23.219737969, 77.729226507, 66.81),
    ]]
    chamfer(chamfer8_edges, length=CHAMFER8_SIZE, length2=CHAMFER8_SIZE2, reference=chamfer8_side[0])

    # Fillet7
    # the kernel refuses this fillet: 10 mm, written as the material it takes off along each edge
    with BuildSketch(Plane(origin=(37.083522107, 135.35, 63.953703987), x_dir=(0, 0, -1), z_dir=(-1, 0, 0))) as fillet7_piece_1:
        with BuildLine():
            CenterArc((3.238895476, 9.93984686), FILLET7_R, 235, 28.712402638)
            Line((-2.496868888, 1.748326417), (-2.611584175, 1.584496008))
            Line((-2.611584175, 1.584496008), (-0.114715287, -0.163830409))
            Line((-0.114715287, -0.163830409), (0, -0.2))
            ThreePointArc((0, -0.2), (1.071851993, -0.2), (2.121800157, -0.198796937))
            Line((2.121800157, -0.198796937), (2.143703987, 0))
        make_face()
    extrude(amount=60, mode=Mode.SUBTRACT)


solid = part.part
